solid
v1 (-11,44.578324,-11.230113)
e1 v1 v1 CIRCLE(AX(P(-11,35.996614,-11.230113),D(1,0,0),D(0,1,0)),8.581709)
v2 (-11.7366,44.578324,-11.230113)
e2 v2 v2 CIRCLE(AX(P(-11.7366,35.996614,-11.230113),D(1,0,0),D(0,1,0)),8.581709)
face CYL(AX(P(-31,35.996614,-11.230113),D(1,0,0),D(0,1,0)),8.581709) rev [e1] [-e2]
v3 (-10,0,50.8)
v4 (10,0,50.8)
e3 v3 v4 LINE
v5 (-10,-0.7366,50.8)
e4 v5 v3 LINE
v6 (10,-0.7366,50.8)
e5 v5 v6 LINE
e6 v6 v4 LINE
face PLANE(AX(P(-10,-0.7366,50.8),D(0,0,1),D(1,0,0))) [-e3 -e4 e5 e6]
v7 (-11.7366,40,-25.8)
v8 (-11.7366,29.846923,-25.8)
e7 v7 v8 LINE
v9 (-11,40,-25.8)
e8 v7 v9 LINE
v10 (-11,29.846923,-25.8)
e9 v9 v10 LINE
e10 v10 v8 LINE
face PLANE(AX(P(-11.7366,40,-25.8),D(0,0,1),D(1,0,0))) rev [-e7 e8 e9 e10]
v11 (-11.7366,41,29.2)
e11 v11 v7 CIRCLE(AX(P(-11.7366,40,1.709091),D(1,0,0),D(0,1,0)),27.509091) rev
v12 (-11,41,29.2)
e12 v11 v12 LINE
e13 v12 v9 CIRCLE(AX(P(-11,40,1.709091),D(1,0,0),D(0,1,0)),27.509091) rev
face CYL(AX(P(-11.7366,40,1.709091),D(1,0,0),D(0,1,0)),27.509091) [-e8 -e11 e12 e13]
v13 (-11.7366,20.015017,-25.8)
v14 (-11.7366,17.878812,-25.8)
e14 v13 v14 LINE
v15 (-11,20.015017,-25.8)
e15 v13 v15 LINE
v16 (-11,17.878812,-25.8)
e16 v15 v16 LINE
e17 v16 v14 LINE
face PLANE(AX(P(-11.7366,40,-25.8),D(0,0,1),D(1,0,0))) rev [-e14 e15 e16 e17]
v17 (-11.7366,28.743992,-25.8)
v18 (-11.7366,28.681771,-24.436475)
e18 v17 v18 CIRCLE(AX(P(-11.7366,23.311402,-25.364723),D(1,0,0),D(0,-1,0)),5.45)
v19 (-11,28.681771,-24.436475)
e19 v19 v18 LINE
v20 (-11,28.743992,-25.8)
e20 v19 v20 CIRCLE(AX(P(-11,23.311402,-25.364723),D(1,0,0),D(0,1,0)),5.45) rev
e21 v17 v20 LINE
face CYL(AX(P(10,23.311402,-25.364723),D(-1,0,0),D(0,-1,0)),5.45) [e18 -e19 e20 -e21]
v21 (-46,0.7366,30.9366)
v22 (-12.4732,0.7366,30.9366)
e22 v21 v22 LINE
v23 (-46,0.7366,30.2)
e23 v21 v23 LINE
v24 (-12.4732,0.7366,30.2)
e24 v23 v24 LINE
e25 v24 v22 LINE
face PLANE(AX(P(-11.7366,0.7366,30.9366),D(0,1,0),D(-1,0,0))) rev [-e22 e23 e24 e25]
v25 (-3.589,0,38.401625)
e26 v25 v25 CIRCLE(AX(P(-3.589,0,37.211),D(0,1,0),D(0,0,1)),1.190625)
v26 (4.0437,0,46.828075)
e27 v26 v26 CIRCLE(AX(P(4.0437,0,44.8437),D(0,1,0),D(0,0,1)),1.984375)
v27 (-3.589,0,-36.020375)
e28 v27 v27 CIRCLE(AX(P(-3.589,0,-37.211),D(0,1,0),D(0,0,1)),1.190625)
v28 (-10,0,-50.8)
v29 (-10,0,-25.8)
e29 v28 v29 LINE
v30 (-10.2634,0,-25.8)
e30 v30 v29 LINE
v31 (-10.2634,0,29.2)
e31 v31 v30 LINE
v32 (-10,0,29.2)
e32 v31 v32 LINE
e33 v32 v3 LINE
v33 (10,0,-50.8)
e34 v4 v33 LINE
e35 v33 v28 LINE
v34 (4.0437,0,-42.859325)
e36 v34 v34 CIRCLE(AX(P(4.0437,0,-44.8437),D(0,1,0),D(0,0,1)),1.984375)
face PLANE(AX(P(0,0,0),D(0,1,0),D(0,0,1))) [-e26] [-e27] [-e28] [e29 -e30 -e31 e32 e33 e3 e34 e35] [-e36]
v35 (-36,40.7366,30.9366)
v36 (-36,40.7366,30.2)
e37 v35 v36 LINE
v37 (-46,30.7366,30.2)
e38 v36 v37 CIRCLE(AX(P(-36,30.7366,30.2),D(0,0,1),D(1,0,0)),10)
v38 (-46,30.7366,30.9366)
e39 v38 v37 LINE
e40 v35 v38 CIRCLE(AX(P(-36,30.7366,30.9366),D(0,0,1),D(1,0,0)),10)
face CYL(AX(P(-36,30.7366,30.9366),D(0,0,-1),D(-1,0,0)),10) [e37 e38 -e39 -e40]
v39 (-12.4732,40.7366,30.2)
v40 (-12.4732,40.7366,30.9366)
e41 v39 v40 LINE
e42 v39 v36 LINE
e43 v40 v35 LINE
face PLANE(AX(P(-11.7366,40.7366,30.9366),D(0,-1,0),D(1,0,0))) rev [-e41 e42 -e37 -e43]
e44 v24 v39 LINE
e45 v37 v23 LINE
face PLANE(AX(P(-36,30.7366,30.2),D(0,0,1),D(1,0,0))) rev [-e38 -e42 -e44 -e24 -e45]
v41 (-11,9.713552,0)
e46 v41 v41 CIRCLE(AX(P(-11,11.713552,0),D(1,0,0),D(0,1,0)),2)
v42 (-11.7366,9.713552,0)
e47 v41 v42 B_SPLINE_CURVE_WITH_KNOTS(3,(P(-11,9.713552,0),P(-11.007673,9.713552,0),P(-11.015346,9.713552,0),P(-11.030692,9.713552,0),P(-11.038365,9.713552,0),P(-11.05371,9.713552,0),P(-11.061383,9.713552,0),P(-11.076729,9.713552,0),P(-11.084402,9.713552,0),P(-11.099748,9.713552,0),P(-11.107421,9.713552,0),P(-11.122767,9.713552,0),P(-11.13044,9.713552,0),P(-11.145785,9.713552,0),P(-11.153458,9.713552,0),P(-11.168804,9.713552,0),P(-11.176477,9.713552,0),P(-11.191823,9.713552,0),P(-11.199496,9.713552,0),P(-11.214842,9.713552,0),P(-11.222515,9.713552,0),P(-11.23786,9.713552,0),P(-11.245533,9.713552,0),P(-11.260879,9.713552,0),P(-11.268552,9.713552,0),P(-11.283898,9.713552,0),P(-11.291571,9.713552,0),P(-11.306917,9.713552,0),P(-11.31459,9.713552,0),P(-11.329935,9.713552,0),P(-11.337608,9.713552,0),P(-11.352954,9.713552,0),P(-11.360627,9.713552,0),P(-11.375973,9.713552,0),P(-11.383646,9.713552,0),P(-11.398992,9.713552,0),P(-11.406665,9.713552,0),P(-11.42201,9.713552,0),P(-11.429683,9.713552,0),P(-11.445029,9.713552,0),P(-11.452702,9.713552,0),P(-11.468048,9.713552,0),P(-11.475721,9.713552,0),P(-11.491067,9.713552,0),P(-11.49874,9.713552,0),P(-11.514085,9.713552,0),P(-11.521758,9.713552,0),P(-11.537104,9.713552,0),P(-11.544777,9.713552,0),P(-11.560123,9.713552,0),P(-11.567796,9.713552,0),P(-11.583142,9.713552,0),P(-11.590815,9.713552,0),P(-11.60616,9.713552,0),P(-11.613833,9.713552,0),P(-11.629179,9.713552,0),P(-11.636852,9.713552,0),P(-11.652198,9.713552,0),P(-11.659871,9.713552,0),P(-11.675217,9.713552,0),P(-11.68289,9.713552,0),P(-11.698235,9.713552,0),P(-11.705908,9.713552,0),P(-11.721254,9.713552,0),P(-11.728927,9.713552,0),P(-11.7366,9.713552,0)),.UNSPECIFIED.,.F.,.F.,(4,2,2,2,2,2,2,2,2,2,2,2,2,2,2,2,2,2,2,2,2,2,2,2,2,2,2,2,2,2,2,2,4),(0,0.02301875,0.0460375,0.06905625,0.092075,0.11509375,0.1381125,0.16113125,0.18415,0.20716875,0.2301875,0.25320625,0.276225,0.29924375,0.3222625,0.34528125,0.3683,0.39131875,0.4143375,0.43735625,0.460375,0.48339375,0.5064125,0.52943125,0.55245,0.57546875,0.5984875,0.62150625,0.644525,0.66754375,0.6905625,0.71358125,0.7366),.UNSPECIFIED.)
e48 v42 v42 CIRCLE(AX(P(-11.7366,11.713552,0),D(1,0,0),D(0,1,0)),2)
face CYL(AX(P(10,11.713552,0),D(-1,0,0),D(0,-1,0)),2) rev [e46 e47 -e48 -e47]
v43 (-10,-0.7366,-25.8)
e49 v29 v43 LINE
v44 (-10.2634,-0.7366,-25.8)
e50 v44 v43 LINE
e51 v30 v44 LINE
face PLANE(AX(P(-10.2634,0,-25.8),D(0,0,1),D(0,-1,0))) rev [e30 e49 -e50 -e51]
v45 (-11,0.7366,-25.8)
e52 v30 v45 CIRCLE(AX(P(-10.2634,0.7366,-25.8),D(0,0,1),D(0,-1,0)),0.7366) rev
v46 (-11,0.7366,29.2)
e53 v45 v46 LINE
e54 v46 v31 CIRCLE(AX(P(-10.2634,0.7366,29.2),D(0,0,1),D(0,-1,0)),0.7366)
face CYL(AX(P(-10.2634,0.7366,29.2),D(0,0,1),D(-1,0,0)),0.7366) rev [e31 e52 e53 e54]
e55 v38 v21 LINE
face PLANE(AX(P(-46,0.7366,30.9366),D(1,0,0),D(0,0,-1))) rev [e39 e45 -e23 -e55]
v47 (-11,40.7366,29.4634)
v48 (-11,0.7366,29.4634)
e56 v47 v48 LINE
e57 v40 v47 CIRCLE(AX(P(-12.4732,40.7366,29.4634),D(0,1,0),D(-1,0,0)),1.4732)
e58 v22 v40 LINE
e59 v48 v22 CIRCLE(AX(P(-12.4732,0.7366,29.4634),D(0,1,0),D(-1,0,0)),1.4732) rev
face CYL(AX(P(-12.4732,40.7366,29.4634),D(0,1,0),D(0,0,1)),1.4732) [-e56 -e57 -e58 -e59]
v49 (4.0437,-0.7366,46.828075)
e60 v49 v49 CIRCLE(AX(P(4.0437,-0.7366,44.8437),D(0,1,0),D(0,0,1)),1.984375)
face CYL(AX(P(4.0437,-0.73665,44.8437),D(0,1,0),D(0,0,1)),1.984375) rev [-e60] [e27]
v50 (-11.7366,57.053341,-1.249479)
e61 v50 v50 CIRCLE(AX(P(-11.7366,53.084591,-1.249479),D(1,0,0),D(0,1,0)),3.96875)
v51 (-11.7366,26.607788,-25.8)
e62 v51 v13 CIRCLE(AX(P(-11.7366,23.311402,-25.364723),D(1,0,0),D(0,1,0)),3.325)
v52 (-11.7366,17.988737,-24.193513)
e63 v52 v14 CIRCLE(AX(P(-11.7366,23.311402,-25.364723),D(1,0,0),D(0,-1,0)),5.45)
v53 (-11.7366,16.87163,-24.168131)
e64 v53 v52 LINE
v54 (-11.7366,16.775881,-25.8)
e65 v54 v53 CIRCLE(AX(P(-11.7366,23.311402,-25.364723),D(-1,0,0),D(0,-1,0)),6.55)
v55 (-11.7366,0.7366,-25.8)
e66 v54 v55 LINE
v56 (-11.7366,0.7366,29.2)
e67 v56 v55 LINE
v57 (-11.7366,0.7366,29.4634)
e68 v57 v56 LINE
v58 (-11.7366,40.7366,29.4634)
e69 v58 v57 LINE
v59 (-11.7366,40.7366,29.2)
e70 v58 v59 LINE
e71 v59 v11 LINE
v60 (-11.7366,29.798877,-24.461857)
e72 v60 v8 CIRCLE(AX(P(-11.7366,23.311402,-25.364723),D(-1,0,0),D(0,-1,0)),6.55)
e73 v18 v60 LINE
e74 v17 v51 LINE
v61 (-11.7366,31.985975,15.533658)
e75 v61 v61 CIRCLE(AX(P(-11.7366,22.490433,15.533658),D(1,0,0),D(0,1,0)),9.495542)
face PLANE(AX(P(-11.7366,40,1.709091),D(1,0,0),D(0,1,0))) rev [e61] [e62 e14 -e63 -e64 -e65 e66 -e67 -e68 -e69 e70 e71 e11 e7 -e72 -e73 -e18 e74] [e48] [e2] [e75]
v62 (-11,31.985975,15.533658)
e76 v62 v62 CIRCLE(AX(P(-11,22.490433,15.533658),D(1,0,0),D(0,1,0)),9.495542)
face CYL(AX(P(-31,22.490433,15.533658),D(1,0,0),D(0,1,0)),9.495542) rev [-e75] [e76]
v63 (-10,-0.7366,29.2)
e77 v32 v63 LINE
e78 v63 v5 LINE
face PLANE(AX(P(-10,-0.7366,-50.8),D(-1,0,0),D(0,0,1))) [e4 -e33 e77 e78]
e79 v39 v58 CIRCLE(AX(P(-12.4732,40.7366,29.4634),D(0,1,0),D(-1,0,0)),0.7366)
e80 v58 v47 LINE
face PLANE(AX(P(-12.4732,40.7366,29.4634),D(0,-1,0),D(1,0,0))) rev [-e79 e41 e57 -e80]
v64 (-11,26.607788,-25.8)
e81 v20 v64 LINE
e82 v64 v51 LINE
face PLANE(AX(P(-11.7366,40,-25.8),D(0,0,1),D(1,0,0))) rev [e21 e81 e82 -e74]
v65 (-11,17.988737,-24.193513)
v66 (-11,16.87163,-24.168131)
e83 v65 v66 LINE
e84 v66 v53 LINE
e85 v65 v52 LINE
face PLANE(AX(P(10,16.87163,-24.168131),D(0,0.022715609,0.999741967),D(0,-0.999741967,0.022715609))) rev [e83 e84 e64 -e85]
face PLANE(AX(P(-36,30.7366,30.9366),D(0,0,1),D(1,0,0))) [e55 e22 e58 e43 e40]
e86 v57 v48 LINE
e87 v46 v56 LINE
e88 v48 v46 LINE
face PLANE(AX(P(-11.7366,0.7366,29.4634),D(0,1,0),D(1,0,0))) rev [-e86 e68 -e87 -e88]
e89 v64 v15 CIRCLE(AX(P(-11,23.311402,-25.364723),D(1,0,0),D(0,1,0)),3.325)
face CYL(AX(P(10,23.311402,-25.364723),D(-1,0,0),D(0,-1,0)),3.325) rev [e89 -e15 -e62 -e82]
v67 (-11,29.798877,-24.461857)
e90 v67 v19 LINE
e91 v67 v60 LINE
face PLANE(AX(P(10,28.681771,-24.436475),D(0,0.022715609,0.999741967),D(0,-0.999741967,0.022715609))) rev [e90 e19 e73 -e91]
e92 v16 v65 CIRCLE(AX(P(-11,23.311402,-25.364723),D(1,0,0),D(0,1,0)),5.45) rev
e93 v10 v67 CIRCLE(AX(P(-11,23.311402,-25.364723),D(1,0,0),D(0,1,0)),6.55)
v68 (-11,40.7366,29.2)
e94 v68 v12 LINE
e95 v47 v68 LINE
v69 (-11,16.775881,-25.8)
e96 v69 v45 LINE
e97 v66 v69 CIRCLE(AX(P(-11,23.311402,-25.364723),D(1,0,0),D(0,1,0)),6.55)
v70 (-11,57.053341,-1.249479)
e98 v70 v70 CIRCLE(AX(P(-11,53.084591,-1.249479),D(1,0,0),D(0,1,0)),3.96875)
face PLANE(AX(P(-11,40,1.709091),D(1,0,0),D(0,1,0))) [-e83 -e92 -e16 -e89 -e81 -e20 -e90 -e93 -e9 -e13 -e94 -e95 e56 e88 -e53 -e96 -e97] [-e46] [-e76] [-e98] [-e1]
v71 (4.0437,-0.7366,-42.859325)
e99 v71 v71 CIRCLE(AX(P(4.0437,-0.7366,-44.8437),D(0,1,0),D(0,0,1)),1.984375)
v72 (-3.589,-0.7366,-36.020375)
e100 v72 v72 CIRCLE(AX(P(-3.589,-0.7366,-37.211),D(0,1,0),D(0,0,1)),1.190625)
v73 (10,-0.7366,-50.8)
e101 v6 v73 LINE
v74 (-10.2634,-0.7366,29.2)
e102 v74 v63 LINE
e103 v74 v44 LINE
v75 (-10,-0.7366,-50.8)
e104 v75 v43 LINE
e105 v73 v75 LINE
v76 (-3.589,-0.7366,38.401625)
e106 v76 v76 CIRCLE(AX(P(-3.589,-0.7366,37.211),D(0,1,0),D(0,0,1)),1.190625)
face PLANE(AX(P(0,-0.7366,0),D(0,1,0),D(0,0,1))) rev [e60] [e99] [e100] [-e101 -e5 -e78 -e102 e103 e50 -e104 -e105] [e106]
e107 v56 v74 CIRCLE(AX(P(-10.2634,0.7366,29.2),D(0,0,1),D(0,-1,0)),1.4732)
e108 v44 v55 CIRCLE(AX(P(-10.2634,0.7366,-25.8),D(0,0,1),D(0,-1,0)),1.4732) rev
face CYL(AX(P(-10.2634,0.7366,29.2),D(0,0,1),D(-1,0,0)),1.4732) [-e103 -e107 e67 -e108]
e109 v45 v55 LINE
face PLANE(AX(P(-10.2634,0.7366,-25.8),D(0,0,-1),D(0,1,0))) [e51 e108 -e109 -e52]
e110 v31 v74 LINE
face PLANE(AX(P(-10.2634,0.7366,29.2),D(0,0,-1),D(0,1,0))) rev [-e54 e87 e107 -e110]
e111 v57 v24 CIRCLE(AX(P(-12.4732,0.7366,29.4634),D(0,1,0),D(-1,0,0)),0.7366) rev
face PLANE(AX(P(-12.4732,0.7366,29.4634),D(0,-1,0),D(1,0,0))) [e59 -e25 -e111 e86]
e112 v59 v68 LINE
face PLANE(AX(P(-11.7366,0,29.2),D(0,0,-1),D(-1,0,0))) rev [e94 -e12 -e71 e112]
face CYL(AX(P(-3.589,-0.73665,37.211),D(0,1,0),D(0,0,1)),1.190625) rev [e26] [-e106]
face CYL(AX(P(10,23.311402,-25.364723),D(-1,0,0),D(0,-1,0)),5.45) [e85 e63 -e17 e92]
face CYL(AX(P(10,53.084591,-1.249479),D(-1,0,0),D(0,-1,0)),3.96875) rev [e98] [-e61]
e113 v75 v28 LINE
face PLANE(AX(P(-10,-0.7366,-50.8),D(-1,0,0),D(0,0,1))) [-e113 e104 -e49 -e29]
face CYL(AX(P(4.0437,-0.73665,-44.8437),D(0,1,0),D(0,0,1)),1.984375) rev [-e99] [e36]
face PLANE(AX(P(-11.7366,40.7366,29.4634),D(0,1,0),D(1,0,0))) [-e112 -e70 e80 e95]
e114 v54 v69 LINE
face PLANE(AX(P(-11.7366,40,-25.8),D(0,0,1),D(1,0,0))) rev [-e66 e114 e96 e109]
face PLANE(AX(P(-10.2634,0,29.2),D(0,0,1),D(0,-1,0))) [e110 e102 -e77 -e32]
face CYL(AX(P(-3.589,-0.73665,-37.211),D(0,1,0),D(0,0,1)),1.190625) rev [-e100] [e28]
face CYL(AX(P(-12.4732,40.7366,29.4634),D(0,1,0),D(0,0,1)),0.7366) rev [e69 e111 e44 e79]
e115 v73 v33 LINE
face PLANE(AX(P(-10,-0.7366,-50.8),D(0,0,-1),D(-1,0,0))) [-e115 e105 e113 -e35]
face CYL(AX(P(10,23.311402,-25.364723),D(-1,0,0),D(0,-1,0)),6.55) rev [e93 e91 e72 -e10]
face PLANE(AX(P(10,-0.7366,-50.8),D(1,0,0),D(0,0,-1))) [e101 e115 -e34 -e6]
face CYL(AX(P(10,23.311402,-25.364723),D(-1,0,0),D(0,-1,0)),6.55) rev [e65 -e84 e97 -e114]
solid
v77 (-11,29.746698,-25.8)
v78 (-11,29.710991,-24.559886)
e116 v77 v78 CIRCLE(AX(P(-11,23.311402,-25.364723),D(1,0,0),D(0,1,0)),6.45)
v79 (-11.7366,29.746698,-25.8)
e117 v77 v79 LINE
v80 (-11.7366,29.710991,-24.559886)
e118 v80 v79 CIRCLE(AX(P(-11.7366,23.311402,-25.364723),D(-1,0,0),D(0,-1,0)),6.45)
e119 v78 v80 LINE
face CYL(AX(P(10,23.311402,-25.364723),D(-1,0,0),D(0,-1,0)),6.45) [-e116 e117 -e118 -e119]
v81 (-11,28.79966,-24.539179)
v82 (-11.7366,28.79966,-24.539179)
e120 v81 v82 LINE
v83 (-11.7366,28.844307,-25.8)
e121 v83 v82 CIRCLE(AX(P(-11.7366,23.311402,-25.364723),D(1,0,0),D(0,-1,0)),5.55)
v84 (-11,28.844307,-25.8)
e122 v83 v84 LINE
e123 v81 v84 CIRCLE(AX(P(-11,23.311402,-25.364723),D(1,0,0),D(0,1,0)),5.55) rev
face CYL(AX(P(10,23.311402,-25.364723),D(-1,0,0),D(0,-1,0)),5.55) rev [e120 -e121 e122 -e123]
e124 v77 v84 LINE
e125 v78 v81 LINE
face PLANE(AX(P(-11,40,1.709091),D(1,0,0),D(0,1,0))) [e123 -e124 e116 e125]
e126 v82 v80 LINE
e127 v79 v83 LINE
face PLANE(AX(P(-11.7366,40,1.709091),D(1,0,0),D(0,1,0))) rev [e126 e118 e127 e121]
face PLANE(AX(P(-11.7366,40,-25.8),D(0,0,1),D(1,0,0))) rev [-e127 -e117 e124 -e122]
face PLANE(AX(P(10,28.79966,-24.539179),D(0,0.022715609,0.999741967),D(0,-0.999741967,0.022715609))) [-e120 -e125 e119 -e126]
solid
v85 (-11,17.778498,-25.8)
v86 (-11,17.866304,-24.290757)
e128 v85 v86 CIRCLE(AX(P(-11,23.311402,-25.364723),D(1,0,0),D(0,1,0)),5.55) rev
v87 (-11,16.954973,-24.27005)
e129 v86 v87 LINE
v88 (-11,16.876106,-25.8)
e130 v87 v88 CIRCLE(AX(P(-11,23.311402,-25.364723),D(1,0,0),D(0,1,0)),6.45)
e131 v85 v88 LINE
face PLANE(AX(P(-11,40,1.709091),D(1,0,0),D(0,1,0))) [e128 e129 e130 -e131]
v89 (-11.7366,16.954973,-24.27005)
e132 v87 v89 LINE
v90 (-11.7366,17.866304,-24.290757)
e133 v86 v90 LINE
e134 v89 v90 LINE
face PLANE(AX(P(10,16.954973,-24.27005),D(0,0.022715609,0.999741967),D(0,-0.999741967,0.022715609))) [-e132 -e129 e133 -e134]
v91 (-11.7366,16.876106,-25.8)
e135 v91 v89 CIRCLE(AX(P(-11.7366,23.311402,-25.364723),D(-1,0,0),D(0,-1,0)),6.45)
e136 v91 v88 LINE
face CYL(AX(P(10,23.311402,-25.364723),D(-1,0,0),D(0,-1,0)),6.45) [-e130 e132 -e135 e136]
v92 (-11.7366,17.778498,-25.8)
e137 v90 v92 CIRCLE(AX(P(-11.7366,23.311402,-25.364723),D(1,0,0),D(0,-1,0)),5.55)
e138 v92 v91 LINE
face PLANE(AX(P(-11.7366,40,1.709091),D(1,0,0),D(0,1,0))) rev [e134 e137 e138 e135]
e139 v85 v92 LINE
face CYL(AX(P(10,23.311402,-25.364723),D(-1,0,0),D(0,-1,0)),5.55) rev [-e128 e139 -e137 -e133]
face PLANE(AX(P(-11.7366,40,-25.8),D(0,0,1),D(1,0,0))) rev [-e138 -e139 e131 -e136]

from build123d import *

# Parameters (mm, degrees)
SKETCH1_W                = 20
SKETCH1_H                = 101.6
BASE_FLANGE1_DEPTH       = 0.7366
EDGE_FLANGE1_DEPTH       = 55
EDGE_FLANGE1_START       = 0.7366
EDGE_FLANGE1_FLAT_DEPTH  = 0.7366
EDGE_FLANGE2_DEPTH       = 40
EDGE_FLANGE2_START       = 0.7366
EDGE_FLANGE2_FLAT_DEPTH  = 0.7366
CUT_EXTRUDE47_DEPTH      = 230.052185051
CUT_EXTRUDE48_DEPTH      = 229.903278335
CUT_EXTRUDE48_DEPTH_BACK = 229.903278335
SKETCH71_R               = 3.96875
CUT_EXTRUDE49_DEPTH      = 230.052185051
CUT_EXTRUDE49_DEPTH_BACK = 230.052185051
SKETCH72_R               = 3.325000001
CUT_EXTRUDE51_DEPTH      = 238.760289891
CUT_EXTRUDE51_DEPTH_BACK = 238.760289891
SKETCH74_R               = 2
CUT_EXTRUDE52_DEPTH      = 257.408459939
CUT_EXTRUDE52_DEPTH_BACK = 257.408459939
SKETCH75_R               = 1.984375
SKETCH75_R_2             = 1.190625
SKETCH101_R              = 9.495541857
SKETCH101_R_2            = 8.581709401
CUT_EXTRUDE56_DEPTH      = 20


# Sheet-metal steps are written as plain solids
with BuildPart() as part:
    # Sketch1 → Base-Flange1 (new body)
    with BuildSketch(Plane(origin=(0, 0, 0), x_dir=(1, 0, 0), z_dir=(0, 1, 0))):
        Rectangle(SKETCH1_W, SKETCH1_H)
    extrude(amount=-BASE_FLANGE1_DEPTH)

    # Edge-Flange1 bend section (across the edge) → Edge-Flange1 (add)
    with BuildSketch(Plane(origin=(-11, 0, -25.8), x_dir=(1, 0, 0), z_dir=(0, 0, 1))):
        with BuildLine():
            Line((-0.7366, 0.7366), (0, 0.7366))
            ThreePointArc((0, 0.7366), (0.215745145, 0.215745145), (0.7366, 0))
            Line((0.7366, 0), (1, 0))
            Line((1, 0), (1, -0.7366))
            Line((1, -0.7366), (0.7366, -0.7366))
            ThreePointArc((0.7366, -0.7366), (-0.30510971, -0.30510971), (-0.7366, 0.7366))
        make_face()
    extrude(amount=EDGE_FLANGE1_DEPTH)

    # Edge-Flange1 profile (on flange) → Edge-Flange1 flat (add)
    with BuildSketch(Plane.ZY.offset(11).offset(EDGE_FLANGE1_START)):
        with BuildLine():
            ThreePointArc((29.2, 41), (1.209008271, 67.504545079), (-25.8, 40))
            Line((-25.8, 40), (-25.8, 0.7366))
            Line((-25.8, 0.7366), (29.2, 0.7366))
            Line((29.2, 0.7366), (29.2, 41))
        make_face()
    extrude(amount=-EDGE_FLANGE1_FLAT_DEPTH)

    # Edge-Flange2 bend section (across the edge) → Edge-Flange2 (add)
    with BuildSketch(Plane(origin=(-11.7366, 0.7366, 30.2), x_dir=(0, 0, -1), z_dir=(0, 1, 0))):
        with BuildLine():
            Line((-0.7366, 0.7366), (0, 0.7366))
            ThreePointArc((0, 0.7366), (0.215745145, 0.215745145), (0.7366, 0))
            Line((0.7366, 0), (1, 0))
            Line((1, 0), (1, -0.7366))
            Line((1, -0.7366), (0.7366, -0.7366))
            ThreePointArc((0.7366, -0.7366), (-0.30510971, -0.30510971), (-0.7366, 0.7366))
        make_face()
    extrude(amount=EDGE_FLANGE2_DEPTH)

    # Edge-Flange2 profile (on flange) → Edge-Flange2 flat (add)
    with BuildSketch(Plane(origin=(-11.7366, 0, 30.2), x_dir=(0, 1, 0), z_dir=(0, 0, 1)).offset(EDGE_FLANGE2_START)):
        with BuildLine():
            Line((0.7366, 34.2634), (0.7366, 0.7366))
            Line((0.7366, 0.7366), (40.7366, 0.7366))
            Line((40.7366, 0.7366), (40.7366, 24.2634))
            ThreePointArc((40.7366, 24.2634), (37.807667812, 31.334467812), (30.7366, 34.2634))
            Line((30.7366, 34.2634), (0.7366, 34.2634))
        make_face()
    extrude(amount=-EDGE_FLANGE2_FLAT_DEPTH)

    # Sketch64 → Cut-Extrude47 (cut, through all)
    # profile 1 of 2: a face of its own
    with BuildSketch(Plane(origin=(-11.7366, -124.793980752, -68.826299478), x_dir=(0, 0, 1), z_dir=(-1, 0, 0))):
        with BuildLine():
            Line((42.264984419, 154.545155362), (42.290366731, 153.42804852))
            ThreePointArc((42.290366731, 153.42804852), (43.337776459, 153.553976781), (44.389824862, 153.475751299))
            Line((44.389824862, 153.475751299), (44.36444255, 154.592858142))
            ThreePointArc((44.36444255, 154.592858142), (43.312789289, 154.653692945), (42.264984419, 154.545155362))
        make_face()
        with BuildLine():
            Line((42.366903907, 154.461812233), (42.387610682, 153.55048153))
            ThreePointArc((42.387610682, 153.55048153), (43.335504899, 153.653950977), (44.28712042, 153.593641187))
            Line((44.28712042, 153.593641187), (44.266413645, 154.504971891))
            ThreePointArc((44.266413645, 154.504971891), (43.31506085, 154.553718748), (42.366903907, 154.461812233))
        make_face(mode=Mode.SUBTRACT)
    # profile 2 of 2: a face of its own
    with BuildSketch(Plane(origin=(-11.7366, -124.793980752, -68.826299478), x_dir=(0, 0, 1), z_dir=(-1, 0, 0))):
        with BuildLine():
            Line((44.65816864, 141.665610755), (44.632786328, 142.782717598))
            ThreePointArc((44.632786328, 142.782717598), (43.585376599, 142.656789337), (42.533328197, 142.735014819))
            Line((42.533328197, 142.735014819), (42.558710509, 141.617907976))
            ThreePointArc((42.558710509, 141.617907976), (43.610363769, 141.557073173), (44.65816864, 141.665610755))
        make_face()
        with BuildLine():
            Line((44.556249151, 141.748953884), (44.535542376, 142.660284588))
            ThreePointArc((44.535542376, 142.660284588), (43.58764816, 142.556815141), (42.636032639, 142.617124931))
            Line((42.636032639, 142.617124931), (42.656739414, 141.705794227))
            ThreePointArc((42.656739414, 141.705794227), (43.608092208, 141.65704737), (44.556249151, 141.748953884))
        make_face(mode=Mode.SUBTRACT)
    extrude(amount=-CUT_EXTRUDE47_DEPTH, mode=Mode.SUBTRACT)


with BuildPart() as cut_extrude47_piece_1:
    # of the separate pieces the step leaves, piece 1, a body of its own (cut_extrude47_pieces)
    add(part.part.solids().sort_by_distance((-10, 0, -50.8))[0])

    # Sketch71 → Cut-Extrude48 (cut, two sides: drawn at the far end of the back side and taken through both)
    with BuildSketch(Plane(origin=(-23.253389833, -124.793980752, -68.826299478), x_dir=(0, 0, 1), z_dir=(-1, 0, 0)).offset(-CUT_EXTRUDE48_DEPTH_BACK)):
        with Locations(Location((67.576820433, 177.878571709, 0), (0, 0, 90))):
            Circle(SKETCH71_R)
    extrude(amount=CUT_EXTRUDE48_DEPTH + CUT_EXTRUDE48_DEPTH_BACK, mode=Mode.SUBTRACT)

    # Sketch72 → Cut-Extrude49 (cut, two sides: drawn at the far end of the back side and taken through both)
    with BuildSketch(Plane(origin=(-11.7366, -124.793980752, -68.826299478), x_dir=(0, 0, 1), z_dir=(-1, 0, 0)).offset(-CUT_EXTRUDE49_DEPTH_BACK)):
        with Locations((43.461576529, 148.105383059)):
            Circle(SKETCH72_R)
    extrude(amount=CUT_EXTRUDE49_DEPTH + CUT_EXTRUDE49_DEPTH_BACK, mode=Mode.SUBTRACT)

    # Sketch74 → Cut-Extrude51 (cut, two sides: drawn at the far end of the back side and taken through both)
    with BuildSketch(Plane(origin=(-62.381161581, -124.793980752, -68.826299478), x_dir=(0, 0, 1), z_dir=(-1, 0, 0)).offset(-CUT_EXTRUDE51_DEPTH_BACK)):
        with Locations(Location((68.826299478, 136.507533033, 0), (0, 0, 270))):
            Circle(SKETCH74_R)
    extrude(amount=CUT_EXTRUDE51_DEPTH + CUT_EXTRUDE51_DEPTH_BACK, mode=Mode.SUBTRACT)

    # Sketch75 → Cut-Extrude52 (cut, two sides: drawn at the far end of the back side and taken through both)
    with BuildSketch(Plane(origin=(-206.511822879, 0, -68.826299478), x_dir=(0.7071067811865436, 0, -0.7071067811865515), z_dir=(0, 1, 0)).offset(-CUT_EXTRUDE52_DEPTH_BACK)):
        with Locations(Location((68.508410595, -229.262065492, 0), (0, 0, 225))):
            Circle(SKETCH75_R)
        with Locations(Location((68.508410595, -218.467797635, 0), (0, 0, 225))):
            Circle(SKETCH75_R_2)
        with Locations(Location((131.926979322, -165.843496765, 0), (0, 0, 225))):
            Circle(SKETCH75_R)
        with Locations(Location((121.132711465, -165.843496765, 0), (0, 0, 225))):
            Circle(SKETCH75_R_2)
    extrude(amount=CUT_EXTRUDE52_DEPTH + CUT_EXTRUDE52_DEPTH_BACK, mode=Mode.SUBTRACT)

    # Sketch101 → Cut-Extrude56 (cut)
    with BuildSketch(Plane(origin=(-11, 0, 0), x_dir=(0, 0, -1), z_dir=(1, 0, 0))):
        with Locations(Location((-15.533658022, 22.490432719, 0), (0, 0, 90))):
            Circle(SKETCH101_R)
        with Locations(Location((11.230113003, 35.996614342, 0), (0, 0, 90))):
            Circle(SKETCH101_R_2)
    extrude(amount=-CUT_EXTRUDE56_DEPTH, mode=Mode.SUBTRACT)


with BuildPart() as cut_extrude47_piece_2:
    # of the separate pieces the step leaves, piece 2, a body of its own (cut_extrude47_pieces)
    add(part.part.solids().sort_by_distance((-11, 16.876106363, -25.8))[0])


with BuildPart() as cut_extrude47_piece_3:
    # of the separate pieces the step leaves, piece 3, a body of its own (cut_extrude47_pieces)
    add(part.part.solids().sort_by_distance((-11, 29.710991139, -24.559885833))[0])


solid = Compound([cut_extrude47_piece_1.part, cut_extrude47_piece_2.part, cut_extrude47_piece_3.part])
